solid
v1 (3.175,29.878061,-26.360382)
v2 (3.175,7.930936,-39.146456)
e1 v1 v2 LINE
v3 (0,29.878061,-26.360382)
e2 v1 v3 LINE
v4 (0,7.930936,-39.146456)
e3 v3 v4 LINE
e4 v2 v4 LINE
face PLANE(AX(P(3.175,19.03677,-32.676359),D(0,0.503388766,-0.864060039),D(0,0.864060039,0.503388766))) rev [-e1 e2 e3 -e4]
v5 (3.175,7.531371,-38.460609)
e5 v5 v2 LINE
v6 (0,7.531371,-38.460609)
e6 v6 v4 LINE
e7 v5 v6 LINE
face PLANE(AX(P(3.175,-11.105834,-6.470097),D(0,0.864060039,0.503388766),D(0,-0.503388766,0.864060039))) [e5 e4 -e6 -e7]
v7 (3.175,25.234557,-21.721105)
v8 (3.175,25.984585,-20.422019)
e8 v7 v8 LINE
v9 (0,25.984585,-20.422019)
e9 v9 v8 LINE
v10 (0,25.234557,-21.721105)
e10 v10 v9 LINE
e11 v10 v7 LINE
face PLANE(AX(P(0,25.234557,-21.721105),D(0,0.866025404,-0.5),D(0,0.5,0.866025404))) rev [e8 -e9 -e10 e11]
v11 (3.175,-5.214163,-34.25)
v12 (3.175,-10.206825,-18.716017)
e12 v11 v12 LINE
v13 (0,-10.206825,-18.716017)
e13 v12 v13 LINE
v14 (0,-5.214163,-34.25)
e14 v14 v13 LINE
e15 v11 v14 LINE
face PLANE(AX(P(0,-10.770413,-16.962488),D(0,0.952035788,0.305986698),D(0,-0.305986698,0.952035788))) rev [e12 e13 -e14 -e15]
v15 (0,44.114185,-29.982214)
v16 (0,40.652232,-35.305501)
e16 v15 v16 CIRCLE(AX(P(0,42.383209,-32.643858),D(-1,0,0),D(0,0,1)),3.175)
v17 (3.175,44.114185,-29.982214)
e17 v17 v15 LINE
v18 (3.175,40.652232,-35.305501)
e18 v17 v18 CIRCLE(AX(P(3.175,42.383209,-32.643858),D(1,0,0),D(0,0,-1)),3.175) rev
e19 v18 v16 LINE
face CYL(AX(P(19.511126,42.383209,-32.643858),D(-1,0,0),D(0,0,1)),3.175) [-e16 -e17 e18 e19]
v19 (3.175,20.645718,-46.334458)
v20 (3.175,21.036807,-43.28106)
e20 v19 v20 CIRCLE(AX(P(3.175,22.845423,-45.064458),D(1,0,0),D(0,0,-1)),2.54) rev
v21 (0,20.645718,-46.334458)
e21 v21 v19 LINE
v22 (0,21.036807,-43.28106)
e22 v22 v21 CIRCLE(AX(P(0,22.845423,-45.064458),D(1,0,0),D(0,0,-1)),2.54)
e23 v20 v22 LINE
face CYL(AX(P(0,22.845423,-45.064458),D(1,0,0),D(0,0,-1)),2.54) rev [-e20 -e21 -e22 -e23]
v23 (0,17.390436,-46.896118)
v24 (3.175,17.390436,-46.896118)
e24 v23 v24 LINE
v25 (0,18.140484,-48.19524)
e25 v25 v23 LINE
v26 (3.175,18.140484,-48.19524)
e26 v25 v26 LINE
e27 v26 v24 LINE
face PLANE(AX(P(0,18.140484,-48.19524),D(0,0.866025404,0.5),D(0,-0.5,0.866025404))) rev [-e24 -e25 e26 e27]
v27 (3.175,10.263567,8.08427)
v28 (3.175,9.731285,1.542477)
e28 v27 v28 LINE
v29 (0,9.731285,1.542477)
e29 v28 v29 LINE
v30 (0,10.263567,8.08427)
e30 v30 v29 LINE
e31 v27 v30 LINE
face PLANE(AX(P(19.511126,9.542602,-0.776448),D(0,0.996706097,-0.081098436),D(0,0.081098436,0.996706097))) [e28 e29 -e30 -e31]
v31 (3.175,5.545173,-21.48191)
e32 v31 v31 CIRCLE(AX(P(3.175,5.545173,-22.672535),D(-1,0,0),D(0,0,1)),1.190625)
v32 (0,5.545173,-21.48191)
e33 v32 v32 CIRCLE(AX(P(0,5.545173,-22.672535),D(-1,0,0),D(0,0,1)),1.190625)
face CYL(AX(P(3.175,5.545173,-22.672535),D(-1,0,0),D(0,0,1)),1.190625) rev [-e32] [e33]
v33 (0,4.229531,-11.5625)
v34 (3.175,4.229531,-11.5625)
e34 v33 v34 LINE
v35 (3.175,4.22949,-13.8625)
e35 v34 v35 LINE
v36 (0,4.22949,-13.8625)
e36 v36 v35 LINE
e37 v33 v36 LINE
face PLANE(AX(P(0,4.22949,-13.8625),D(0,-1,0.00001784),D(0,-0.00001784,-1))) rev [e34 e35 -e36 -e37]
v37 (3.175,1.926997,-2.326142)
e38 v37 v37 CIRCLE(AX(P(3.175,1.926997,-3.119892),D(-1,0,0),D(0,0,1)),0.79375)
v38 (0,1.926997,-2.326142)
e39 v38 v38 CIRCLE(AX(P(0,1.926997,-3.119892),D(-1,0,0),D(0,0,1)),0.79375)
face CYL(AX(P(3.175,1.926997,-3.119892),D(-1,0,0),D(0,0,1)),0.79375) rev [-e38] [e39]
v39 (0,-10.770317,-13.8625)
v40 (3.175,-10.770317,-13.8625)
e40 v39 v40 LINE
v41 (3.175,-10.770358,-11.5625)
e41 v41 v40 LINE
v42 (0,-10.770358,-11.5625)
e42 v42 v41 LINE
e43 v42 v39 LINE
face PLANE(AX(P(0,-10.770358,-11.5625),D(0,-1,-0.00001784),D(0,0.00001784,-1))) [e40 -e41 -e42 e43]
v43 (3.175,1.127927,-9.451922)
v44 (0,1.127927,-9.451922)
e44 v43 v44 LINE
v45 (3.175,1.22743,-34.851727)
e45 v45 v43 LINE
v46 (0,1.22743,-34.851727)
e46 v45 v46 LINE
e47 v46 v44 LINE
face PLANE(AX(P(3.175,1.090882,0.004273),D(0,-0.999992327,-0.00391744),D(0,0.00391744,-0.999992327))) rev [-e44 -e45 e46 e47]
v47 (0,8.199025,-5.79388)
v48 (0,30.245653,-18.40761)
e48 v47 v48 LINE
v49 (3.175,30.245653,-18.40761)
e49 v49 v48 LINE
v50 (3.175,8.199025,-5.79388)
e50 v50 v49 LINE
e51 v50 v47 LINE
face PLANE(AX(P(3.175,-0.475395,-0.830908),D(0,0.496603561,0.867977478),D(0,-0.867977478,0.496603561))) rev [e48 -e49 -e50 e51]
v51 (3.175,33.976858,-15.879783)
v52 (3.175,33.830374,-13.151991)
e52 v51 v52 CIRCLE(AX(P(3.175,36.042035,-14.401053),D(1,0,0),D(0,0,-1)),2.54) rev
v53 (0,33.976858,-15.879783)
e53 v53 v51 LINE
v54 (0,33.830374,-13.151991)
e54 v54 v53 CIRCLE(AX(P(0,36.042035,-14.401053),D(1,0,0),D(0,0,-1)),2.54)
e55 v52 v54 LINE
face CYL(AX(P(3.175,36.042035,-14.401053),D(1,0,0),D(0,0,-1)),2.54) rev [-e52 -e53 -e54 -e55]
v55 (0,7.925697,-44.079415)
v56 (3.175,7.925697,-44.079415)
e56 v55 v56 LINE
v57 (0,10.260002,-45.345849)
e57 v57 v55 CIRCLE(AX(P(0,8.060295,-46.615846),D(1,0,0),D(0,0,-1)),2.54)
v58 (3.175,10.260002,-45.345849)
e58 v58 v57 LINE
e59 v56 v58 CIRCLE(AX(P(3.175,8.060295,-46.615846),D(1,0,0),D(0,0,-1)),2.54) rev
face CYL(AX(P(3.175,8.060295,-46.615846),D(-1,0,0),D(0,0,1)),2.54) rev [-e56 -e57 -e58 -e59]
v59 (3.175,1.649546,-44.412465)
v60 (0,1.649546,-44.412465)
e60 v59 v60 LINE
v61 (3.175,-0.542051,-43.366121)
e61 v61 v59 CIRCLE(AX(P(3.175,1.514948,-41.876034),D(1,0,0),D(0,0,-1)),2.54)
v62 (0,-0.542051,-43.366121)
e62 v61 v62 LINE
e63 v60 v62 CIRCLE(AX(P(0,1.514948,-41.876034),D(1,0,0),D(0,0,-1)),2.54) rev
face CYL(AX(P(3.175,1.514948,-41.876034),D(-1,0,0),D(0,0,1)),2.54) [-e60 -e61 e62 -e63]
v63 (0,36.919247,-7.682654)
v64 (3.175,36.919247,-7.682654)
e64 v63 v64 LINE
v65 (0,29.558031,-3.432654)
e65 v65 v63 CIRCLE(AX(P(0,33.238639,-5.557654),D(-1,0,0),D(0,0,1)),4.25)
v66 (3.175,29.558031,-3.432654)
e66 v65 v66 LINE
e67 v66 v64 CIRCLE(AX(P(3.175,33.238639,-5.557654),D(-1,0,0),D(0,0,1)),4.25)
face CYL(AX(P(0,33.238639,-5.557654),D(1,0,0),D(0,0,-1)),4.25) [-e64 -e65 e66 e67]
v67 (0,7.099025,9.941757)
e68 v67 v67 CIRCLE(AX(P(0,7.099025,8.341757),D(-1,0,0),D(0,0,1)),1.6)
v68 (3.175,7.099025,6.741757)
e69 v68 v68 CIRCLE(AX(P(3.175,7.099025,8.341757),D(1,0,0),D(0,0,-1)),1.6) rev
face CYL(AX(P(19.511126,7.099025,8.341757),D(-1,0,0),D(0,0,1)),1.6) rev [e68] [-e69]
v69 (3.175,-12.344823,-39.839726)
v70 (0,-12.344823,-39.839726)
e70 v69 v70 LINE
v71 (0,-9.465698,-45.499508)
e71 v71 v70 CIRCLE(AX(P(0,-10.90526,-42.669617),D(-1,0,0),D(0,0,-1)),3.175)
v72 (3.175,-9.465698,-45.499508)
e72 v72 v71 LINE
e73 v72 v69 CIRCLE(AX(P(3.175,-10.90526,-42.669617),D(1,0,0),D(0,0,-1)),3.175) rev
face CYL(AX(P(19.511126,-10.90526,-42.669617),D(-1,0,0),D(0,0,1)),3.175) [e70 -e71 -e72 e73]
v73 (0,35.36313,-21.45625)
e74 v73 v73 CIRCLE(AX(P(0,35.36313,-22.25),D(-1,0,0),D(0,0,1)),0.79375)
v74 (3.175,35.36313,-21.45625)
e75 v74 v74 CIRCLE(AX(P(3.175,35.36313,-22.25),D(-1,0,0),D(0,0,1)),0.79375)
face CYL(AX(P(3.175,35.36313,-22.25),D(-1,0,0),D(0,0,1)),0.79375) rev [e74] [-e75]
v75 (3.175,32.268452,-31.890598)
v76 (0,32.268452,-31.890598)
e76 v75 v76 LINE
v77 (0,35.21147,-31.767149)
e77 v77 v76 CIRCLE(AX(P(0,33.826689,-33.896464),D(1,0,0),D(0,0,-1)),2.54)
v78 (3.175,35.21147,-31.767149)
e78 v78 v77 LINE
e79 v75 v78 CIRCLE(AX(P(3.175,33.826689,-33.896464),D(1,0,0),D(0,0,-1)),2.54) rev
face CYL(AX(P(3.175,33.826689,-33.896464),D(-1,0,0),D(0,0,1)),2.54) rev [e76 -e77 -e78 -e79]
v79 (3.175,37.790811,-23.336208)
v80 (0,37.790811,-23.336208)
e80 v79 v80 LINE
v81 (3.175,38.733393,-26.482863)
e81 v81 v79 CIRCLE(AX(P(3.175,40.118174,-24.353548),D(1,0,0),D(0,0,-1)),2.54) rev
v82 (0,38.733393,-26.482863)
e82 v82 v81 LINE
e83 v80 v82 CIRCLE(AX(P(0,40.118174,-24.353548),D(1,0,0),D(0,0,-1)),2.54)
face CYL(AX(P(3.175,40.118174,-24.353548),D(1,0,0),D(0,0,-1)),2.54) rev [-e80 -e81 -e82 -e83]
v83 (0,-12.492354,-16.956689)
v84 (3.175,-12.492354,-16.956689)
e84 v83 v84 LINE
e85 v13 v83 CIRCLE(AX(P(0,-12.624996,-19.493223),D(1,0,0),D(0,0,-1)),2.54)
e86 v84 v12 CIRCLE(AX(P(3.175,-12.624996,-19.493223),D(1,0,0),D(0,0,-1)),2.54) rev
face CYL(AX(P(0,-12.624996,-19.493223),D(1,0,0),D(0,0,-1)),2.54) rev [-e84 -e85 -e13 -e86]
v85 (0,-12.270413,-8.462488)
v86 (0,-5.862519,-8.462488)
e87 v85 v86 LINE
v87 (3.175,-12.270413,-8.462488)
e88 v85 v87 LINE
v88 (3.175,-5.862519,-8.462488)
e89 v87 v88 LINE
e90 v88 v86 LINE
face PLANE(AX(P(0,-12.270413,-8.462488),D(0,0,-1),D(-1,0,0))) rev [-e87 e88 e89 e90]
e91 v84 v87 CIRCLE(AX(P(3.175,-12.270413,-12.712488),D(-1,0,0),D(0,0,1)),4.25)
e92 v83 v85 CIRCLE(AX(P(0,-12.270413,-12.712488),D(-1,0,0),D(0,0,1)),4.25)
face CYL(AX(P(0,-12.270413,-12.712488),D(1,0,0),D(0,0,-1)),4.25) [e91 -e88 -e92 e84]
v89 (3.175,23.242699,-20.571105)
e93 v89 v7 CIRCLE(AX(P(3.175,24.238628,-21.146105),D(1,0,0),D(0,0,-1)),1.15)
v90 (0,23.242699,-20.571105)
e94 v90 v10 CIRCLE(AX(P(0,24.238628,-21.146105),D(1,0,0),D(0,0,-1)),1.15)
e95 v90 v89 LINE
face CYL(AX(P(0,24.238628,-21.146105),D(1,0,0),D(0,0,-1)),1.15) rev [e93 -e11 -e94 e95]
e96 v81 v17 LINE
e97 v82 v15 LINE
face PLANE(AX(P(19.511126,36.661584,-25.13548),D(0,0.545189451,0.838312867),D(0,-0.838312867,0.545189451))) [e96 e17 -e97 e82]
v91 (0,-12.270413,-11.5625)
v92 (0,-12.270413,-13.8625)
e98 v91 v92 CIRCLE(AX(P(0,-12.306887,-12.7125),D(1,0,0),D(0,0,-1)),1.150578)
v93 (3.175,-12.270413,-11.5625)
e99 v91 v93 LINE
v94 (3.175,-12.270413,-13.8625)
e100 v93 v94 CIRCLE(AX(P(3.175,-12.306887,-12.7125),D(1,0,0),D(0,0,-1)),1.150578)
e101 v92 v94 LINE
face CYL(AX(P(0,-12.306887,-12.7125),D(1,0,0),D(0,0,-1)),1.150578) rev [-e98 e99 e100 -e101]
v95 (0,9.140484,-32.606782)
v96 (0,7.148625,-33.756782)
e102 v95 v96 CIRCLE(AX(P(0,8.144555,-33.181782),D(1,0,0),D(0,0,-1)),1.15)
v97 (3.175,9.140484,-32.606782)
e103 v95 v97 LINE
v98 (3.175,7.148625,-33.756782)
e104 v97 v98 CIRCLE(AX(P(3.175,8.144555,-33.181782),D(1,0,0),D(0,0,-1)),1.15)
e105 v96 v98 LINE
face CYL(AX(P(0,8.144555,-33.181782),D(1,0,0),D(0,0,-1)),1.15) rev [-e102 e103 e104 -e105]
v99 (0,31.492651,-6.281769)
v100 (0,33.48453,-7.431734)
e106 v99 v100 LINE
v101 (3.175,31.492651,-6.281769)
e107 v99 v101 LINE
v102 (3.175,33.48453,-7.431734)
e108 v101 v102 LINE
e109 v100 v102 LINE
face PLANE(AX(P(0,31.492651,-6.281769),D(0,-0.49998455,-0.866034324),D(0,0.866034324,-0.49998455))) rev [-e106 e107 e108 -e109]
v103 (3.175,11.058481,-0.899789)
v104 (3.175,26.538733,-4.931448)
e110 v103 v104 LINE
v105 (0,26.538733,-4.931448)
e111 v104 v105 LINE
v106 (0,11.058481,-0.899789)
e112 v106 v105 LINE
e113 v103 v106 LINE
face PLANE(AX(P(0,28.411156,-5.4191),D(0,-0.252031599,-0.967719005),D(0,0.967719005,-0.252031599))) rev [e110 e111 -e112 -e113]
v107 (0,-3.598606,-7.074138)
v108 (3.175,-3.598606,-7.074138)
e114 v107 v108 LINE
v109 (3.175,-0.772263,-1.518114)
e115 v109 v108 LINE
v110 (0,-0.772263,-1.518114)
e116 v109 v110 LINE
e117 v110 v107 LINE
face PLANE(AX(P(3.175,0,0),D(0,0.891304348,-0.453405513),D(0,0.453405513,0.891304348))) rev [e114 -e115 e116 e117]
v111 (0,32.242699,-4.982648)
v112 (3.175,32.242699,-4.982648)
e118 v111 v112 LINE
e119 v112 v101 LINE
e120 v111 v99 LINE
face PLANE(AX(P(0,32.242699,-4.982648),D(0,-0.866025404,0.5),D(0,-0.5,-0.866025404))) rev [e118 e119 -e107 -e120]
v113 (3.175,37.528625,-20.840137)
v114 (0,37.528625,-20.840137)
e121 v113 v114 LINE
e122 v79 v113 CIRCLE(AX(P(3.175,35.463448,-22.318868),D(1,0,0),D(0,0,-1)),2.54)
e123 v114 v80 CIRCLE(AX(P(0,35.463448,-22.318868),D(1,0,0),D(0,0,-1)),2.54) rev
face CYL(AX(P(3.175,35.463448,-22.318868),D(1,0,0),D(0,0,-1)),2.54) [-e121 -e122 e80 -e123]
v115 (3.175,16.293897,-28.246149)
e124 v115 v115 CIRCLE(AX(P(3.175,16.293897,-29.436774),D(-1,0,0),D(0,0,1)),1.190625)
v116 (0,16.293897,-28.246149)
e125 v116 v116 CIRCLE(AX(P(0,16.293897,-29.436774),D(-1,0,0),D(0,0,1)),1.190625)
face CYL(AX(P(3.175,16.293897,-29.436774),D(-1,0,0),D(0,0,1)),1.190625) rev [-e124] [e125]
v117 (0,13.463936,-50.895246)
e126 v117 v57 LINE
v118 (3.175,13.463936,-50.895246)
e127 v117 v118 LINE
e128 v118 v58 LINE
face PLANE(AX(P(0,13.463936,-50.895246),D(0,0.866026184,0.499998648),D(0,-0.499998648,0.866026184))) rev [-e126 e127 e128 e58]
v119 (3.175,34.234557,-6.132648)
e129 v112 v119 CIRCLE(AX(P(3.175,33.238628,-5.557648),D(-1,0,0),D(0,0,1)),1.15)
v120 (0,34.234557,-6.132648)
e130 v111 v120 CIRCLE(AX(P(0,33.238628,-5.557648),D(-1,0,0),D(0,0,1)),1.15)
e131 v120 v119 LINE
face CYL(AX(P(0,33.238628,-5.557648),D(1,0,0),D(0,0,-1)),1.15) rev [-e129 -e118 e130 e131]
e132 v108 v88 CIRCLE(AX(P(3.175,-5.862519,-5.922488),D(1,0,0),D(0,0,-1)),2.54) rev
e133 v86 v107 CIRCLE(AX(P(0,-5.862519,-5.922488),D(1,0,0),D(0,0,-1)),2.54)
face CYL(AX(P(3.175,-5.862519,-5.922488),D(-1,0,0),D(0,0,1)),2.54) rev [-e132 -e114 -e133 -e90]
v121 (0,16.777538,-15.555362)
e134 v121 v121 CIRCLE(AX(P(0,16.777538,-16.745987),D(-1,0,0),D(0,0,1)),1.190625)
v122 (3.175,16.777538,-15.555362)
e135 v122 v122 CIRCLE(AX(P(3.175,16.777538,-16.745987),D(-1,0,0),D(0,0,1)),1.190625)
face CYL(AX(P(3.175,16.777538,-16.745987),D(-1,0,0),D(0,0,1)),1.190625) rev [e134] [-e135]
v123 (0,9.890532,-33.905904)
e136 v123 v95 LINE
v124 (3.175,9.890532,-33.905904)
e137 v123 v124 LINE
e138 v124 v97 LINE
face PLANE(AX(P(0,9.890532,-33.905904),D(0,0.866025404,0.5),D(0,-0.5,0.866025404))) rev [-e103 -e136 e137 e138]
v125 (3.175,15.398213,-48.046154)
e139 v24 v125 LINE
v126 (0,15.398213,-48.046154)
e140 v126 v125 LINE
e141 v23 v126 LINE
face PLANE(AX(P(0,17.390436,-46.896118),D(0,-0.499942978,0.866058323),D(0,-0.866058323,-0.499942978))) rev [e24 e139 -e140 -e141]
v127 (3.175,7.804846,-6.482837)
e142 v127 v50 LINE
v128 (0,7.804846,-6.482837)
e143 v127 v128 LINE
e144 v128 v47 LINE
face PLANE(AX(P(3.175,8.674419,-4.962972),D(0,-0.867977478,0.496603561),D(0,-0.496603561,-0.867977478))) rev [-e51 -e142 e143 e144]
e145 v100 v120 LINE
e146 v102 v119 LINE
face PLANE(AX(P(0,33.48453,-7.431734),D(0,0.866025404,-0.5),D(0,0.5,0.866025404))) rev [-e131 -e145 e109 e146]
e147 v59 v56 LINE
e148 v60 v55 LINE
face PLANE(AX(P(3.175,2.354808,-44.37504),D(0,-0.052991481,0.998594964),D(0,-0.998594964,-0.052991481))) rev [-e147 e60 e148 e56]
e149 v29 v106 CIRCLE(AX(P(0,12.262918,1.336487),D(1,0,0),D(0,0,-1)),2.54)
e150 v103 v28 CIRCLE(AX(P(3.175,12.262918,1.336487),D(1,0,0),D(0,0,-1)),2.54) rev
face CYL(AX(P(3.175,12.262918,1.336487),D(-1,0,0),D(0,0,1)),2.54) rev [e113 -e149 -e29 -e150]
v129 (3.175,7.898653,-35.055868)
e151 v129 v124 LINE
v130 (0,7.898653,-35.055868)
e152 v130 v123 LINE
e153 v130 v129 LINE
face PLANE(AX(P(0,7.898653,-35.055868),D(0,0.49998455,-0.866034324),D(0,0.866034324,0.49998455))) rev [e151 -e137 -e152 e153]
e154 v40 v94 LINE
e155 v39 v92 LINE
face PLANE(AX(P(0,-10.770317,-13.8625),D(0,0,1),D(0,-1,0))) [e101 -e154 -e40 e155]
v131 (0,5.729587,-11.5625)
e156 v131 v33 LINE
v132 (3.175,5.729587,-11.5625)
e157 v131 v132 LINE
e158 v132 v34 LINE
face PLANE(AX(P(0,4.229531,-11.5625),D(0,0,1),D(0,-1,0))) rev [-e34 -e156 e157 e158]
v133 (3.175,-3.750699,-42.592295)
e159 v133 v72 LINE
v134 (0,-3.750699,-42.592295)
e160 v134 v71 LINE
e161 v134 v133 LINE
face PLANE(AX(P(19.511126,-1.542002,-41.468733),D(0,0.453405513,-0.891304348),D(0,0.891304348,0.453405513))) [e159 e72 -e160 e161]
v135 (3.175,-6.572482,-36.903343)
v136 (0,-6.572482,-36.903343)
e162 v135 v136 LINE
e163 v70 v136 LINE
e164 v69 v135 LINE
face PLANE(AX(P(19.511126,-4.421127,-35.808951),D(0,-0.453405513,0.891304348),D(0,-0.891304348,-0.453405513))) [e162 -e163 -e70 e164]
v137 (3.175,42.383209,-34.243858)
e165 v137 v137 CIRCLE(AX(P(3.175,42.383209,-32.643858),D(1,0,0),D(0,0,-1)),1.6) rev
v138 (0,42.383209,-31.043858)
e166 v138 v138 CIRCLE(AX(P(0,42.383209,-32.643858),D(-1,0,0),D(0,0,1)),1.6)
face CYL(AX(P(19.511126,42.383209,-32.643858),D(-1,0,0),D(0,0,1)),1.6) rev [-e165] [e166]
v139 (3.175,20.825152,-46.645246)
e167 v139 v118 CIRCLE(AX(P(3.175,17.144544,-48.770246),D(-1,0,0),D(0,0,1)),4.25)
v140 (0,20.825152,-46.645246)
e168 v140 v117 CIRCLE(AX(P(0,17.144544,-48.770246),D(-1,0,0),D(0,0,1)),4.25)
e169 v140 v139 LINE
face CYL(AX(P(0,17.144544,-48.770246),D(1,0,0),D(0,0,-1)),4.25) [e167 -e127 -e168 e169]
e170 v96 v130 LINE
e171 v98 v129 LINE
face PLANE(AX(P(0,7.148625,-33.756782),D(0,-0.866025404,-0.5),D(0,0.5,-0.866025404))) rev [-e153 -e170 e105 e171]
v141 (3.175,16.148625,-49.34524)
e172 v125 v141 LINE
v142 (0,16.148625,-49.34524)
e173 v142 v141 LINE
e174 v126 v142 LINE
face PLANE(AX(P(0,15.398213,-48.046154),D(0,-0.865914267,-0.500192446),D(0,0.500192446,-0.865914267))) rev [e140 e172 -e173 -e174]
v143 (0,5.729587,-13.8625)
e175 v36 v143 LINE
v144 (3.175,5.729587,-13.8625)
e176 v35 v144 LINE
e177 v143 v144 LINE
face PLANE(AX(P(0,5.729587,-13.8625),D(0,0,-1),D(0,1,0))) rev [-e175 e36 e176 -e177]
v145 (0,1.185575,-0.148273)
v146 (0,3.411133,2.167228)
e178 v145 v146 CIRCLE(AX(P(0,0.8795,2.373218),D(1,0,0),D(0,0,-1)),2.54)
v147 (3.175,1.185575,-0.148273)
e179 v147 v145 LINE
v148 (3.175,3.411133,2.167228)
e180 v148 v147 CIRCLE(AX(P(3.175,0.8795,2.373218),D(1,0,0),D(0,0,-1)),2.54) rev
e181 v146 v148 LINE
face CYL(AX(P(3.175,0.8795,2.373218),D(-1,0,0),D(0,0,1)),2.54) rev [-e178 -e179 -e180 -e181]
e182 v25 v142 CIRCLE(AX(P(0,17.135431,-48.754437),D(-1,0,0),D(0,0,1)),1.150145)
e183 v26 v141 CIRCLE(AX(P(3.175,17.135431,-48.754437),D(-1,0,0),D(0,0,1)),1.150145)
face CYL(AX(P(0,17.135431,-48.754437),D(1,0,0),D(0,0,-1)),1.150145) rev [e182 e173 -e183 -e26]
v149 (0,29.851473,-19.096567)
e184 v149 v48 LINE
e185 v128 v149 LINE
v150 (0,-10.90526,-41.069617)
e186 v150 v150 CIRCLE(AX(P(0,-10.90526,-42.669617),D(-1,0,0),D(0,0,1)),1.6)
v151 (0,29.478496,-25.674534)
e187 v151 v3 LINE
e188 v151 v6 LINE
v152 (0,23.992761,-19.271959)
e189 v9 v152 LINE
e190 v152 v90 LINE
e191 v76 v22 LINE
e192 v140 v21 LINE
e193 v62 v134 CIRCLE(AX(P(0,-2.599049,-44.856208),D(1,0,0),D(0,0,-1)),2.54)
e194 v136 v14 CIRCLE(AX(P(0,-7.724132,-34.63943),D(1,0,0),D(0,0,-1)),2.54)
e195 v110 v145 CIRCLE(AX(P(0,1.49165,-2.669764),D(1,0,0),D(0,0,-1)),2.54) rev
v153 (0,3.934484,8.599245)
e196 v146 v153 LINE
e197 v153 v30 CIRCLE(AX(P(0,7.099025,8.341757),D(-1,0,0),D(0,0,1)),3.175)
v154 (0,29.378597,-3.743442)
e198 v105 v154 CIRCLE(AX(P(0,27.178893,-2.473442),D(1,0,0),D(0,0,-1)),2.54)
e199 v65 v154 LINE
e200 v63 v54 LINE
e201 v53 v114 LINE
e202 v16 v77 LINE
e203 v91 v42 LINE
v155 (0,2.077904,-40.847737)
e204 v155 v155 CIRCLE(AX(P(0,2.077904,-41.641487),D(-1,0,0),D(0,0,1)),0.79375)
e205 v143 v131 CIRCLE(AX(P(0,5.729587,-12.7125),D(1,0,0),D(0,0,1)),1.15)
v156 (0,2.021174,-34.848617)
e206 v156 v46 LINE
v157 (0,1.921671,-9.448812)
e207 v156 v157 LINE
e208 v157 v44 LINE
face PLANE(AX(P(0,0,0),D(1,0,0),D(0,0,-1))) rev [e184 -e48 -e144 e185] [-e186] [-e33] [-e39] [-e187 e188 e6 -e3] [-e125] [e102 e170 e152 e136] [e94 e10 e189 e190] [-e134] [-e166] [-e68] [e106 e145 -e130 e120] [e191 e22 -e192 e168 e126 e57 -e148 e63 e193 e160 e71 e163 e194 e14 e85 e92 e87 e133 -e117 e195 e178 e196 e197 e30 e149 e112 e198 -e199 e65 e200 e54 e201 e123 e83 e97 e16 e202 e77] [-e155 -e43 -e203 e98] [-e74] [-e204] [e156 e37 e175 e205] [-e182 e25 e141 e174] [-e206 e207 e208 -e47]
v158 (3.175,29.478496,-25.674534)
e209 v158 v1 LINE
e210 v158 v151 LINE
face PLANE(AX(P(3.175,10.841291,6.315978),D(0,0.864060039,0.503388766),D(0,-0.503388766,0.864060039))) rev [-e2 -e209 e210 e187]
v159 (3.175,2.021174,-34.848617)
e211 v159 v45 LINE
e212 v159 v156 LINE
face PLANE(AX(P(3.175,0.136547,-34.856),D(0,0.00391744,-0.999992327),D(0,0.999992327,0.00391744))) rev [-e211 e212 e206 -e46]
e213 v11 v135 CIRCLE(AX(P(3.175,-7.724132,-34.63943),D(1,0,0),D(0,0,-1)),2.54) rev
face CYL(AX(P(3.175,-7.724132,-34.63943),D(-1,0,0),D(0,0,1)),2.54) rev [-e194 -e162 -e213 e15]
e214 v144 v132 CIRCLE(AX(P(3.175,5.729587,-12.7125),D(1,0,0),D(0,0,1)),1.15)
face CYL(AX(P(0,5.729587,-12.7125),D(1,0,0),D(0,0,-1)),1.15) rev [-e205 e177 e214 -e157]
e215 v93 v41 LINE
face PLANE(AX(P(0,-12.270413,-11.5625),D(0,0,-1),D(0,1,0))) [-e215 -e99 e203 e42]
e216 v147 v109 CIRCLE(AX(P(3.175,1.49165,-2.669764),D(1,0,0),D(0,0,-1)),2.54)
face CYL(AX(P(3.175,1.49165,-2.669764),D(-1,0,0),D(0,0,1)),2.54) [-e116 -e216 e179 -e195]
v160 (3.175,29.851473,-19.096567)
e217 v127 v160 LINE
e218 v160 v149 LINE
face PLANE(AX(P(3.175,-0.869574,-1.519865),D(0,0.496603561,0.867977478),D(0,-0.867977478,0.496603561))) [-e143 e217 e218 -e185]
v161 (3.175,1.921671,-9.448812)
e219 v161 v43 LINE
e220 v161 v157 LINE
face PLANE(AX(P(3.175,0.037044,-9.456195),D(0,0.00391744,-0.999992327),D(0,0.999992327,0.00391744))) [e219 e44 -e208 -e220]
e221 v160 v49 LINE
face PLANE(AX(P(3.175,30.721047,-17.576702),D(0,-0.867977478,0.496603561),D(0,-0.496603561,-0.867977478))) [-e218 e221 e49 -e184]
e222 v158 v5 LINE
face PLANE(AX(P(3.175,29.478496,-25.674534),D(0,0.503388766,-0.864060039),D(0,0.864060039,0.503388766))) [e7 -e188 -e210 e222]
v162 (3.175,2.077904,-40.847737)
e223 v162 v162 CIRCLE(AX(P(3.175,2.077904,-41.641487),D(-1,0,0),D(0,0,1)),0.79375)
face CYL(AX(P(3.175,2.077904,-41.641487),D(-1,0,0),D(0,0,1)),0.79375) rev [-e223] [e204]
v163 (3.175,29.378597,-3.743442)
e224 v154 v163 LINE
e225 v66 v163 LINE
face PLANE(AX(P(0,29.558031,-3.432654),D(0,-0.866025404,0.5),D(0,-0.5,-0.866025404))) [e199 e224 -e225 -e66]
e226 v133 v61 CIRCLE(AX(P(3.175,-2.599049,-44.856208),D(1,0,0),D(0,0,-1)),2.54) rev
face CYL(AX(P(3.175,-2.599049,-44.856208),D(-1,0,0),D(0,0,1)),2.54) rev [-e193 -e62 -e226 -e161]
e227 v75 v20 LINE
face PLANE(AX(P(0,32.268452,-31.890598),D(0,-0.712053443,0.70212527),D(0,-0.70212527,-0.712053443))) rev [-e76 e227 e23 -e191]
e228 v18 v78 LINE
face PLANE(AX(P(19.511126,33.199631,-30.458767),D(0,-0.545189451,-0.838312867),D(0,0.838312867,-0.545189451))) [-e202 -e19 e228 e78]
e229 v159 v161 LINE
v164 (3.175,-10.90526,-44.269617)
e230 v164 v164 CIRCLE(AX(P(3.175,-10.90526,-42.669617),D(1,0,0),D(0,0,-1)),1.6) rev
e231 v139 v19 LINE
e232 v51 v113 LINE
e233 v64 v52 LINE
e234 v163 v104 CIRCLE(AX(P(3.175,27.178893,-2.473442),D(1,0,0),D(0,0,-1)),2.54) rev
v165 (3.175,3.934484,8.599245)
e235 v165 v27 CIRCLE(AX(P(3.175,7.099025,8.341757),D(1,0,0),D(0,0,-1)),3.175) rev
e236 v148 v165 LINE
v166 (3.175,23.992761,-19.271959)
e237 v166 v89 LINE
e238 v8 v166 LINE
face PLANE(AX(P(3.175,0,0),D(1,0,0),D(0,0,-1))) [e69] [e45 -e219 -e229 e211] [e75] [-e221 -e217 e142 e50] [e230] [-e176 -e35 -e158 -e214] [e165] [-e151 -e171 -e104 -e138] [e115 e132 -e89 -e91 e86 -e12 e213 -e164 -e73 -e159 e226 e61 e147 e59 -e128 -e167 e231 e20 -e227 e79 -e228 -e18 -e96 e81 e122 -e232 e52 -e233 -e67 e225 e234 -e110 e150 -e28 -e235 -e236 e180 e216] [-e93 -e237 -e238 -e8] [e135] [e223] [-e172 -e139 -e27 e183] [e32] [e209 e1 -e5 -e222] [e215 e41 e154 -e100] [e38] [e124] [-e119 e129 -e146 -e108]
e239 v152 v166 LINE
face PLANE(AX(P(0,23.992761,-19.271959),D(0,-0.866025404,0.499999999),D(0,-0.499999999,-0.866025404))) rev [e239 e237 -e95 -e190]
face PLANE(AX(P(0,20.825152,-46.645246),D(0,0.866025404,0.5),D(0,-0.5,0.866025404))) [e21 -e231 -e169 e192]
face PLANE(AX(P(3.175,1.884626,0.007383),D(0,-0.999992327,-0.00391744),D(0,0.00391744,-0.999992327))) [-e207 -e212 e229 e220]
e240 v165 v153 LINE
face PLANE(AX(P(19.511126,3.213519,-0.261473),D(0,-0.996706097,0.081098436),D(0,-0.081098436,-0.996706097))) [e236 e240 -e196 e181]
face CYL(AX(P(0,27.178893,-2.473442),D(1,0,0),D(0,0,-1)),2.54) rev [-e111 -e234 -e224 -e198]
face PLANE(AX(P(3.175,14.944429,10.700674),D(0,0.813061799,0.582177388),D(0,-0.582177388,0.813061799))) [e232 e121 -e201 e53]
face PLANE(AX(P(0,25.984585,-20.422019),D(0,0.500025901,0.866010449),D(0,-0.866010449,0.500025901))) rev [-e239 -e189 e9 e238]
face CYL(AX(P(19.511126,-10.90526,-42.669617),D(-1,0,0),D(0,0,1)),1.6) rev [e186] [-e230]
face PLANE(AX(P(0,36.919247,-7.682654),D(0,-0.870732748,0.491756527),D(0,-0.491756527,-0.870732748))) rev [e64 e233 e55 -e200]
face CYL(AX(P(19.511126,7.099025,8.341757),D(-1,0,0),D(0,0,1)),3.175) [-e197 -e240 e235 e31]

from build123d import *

# Parameters (mm, degrees)
BOSS_EXTRUDE1_DEPTH = 3.175
SKETCH7_R           = 0.79375
CUT_EXTRUDE6_DEPTH  = 59.953525128
SKETCH8_W           = 24
SKETCH8_H           = 4.7625
BOSS_EXTRUDE2_DEPTH = 3.175
BOSS_EXTRUDE3_DEPTH = 3.175
CUT_EXTRUDE8_DEPTH  = 3.175
CUT_EXTRUDE7_DEPTH  = 3.175
FILLET1_R           = 2.54
FILLET2_R           = 2.54
SKETCH13_R          = 1.190625
CUT_EXTRUDE9_DEPTH  = 3.175
CUT_EXTRUDE10_DEPTH = 3.175
SKETCH17_R          = 1.6
BOSS_EXTRUDE5_DEPTH = 3.175
FILLET4_R           = 2.54


with BuildPart() as part:
    # Sketch1 → Boss-Extrude1 (new body)
    with BuildSketch(Plane(origin=(0, 0, 0), x_dir=(0, 0, -1), z_dir=(1, 0, 0))):
        Polygon((43.890597967, 11.483842091), (31.890597967, 32.268451781), (22.25, 38.538130468), (44.5, 0), align=None)
        Polygon((22.25, 38.538130468), (44.5, 0), (0, 0), align=None)
        Polygon((0.899789316, 11.058480811), (12.899789316, 31.843090502), (22.25, 38.538130468), (0, 0), align=None)
        Polygon((10.25, -5.214163404), (34.25, -5.214163404), (44.5, 0), (0, 0), align=None)
    extrude(amount=BOSS_EXTRUDE1_DEPTH)

    # Sketch7 → Cut-Extrude6 (cut, through all)
    with BuildSketch(Plane.ZY):
        with Locations((-22.25, 35.363130468)):
            Circle(SKETCH7_R)
        with Locations((-3.119892109, 1.92699728)):
            Circle(SKETCH7_R)
        with Locations((-41.6414868, 2.077904463)):
            Circle(SKETCH7_R)
    extrude(amount=-CUT_EXTRUDE6_DEPTH, mode=Mode.SUBTRACT)

    # Sketch8 → Boss-Extrude2 (add)
    with BuildSketch(Plane.ZY):
        Polygon((-43.890597967, 11.483842091), (-31.890597967, 32.268451781), (-36.015043953, 34.649701781), (-48.015043953, 13.865092091), align=None)
        with Locations((-22.25, -7.595413404)):
            Rectangle(SKETCH8_W, SKETCH8_H)
        Polygon((-12.899789316, 31.843090502), (-0.899789316, 11.058480811), (3.22465667, 13.439730811), (-8.77534333, 34.224340502), align=None)
    extrude(amount=-BOSS_EXTRUDE2_DEPTH)

    # Sketch9 → Boss-Extrude3 (add)
    # profile 1 of 3: a face of its own
    with BuildSketch(Plane(origin=(3.175, 0, 0), x_dir=(0, 0, -1), z_dir=(1, 0, 0))):
        with BuildLine():
            Line((3.432653779, 29.558030749), (5.419099548, 28.411155749))
            Line((5.419099548, 28.411155749), (8.77534333, 34.224340502))
            Line((8.77534333, 34.224340502), (12.899789316, 31.843090502))
            Line((12.899789316, 31.843090502), (14.562601584, 33.033715502))
            Line((14.562601584, 33.033715502), (7.682653779, 36.919246681))
            ThreePointArc((7.682653779, 36.919246681), (1.877045812, 35.363638715), (3.432653779, 29.558030749))
        make_face()
        with BuildLine():
            Line((4.98264756, 32.24269873), (6.281769095, 31.492650563))
            Line((6.281769095, 31.492650563), (7.43173356, 33.484529507))
            Line((7.43173356, 33.484529507), (6.13264756, 34.234557159))
            ThreePointArc((6.13264756, 34.234557159), (4.561718346, 33.813627945), (4.98264756, 32.24269873))
        make_face(mode=Mode.SUBTRACT)
    # profile 2 of 3: a face of its own
    with BuildSketch(Plane(origin=(3.175, 0, 0), x_dir=(0, 0, -1), z_dir=(1, 0, 0))):
        with BuildLine():
            Line((8.462487563, -12.270413404), (8.462487563, -4.304857849))
            Line((8.462487563, -4.304857849), (10.25, -5.214163404))
            Line((10.25, -5.214163404), (10.25, -9.976663404))
            Line((10.25, -9.976663404), (20.606380555, -9.976663404))
            Line((20.606380555, -9.976663404), (20.606380555, -10.770413404))
            Line((20.606380555, -10.770413404), (16.962487563, -10.770413404))
            Line((16.962487563, -10.770413404), (16.962487563, -12.270413404))
            ThreePointArc((16.962487563, -12.270413404), (12.712487563, -16.520413404), (8.462487563, -12.270413404))
        make_face()
        with BuildLine():
            Line((11.5625, -12.270413404), (11.5625, -10.7703581))
            Line((11.5625, -10.7703581), (13.8625, -10.770317068))
            Line((13.8625, -10.770317068), (13.8625, -12.270413404))
            ThreePointArc((13.8625, -12.270413404), (12.7125, -13.457465158), (11.5625, -12.270413404))
        make_face(mode=Mode.SUBTRACT)
    # profile 3 of 3: a face of its own
    with BuildSketch(Plane(origin=(3.175, 0, 0), x_dir=(0, 0, -1), z_dir=(1, 0, 0))):
        with BuildLine():
            Line((46.645245941, 20.825151843), (44.658800171, 19.678276843))
            Line((44.658800171, 19.678276843), (48.015043953, 13.865092091))
            Line((48.015043953, 13.865092091), (43.890597967, 11.483842091))
            Line((43.890597967, 11.483842091), (43.996871736, 9.481172067))
            Line((43.996871736, 9.481172067), (50.895245941, 13.463935911))
            ThreePointArc((50.895245941, 13.463935911), (52.450853907, 19.269543877), (46.645245941, 20.825151843))
        make_face()
        with BuildLine():
            Line((48.195239723, 18.140483862), (46.896118188, 17.390435694))
            Line((46.896118188, 17.390435694), (48.046153723, 15.398212801))
            Line((48.046153723, 15.398212801), (49.345239723, 16.148625433))
            ThreePointArc((49.345239723, 16.148625433), (49.750491106, 17.710503048), (48.195239723, 18.140483862))
        make_face(mode=Mode.SUBTRACT)
    extrude(amount=-BOSS_EXTRUDE3_DEPTH)

    # Sketch12 → Cut-Extrude8 (cut)
    with BuildSketch(Plane(origin=(3.175, 0, 0), x_dir=(0, 0, -1), z_dir=(1, 0, 0))):
        with BuildLine():
            Line((33.756782454, 7.148625433), (35.055868454, 7.898653085))
            Line((35.055868454, 7.898653085), (33.905903989, 9.89053203))
            Line((33.905903989, 9.89053203), (32.606782454, 9.140483862))
            ThreePointArc((32.606782454, 9.140483862), (32.18585324, 7.569554647), (33.756782454, 7.148625433))
        make_face()
        with BuildLine():
            Line((21.721104828, 25.234557159), (20.422018828, 25.984584811))
            Line((20.422018828, 25.984584811), (19.271959255, 23.992760775))
            Line((19.271959255, 23.992760775), (20.571104828, 23.24269873))
            ThreePointArc((20.571104828, 23.24269873), (22.142034043, 23.663627945), (21.721104828, 25.234557159))
        make_face()
        with BuildLine():
            Line((13.8625, 5.729586596), (13.8625, 4.229490261))
            Line((13.8625, 4.229490261), (11.5625, 4.229531293))
            Line((11.5625, 4.229531293), (11.5625, 5.729586596))
            ThreePointArc((11.5625, 5.729586596), (12.7125, 6.879586596), (13.8625, 5.729586596))
        make_face()
    extrude(amount=-CUT_EXTRUDE8_DEPTH, mode=Mode.SUBTRACT)

    # Sketch10 → Cut-Extrude7 (cut)
    with BuildSketch(Plane(origin=(3.175, 0, 0), x_dir=(0, 0, -1), z_dir=(1, 0, 0))):
        Polygon((31.890597967, 32.268451781), (44.658800171, 19.678276843), (36.015043953, 34.649701781), align=None)
        Polygon((5.419099548, 28.411155749), (0.899789316, 11.058480811), (-3.22465667, 13.439730811), align=None)
        Polygon((16.962487563, -10.770413404), (34.25, -5.214163404), (34.25, -11.414104667), align=None)
    extrude(amount=-CUT_EXTRUDE7_DEPTH, mode=Mode.SUBTRACT)

    # Fillet1
    fillet1_edges = [part.edges().sort_by_distance(p)[0] for p in [
        (1.5875, -10.770413404, -16.962487563),
    ]]
    fillet(fillet1_edges, radius=FILLET1_R)

    # Fillet2
    fillet2_edges = [part.edges().sort_by_distance(p)[0] for p in [
        (1.5875, 19.678276843, -44.658800171),
        (1.5875, 9.481172067, -43.996871736),
        (1.5875, -4.304857849, -8.462487563),
        (1.5875, 0, -44.5),
        (1.5875, 0, 0),
        (1.5875, 38.538130468, -22.25),
        (1.5875, 33.033715502, -14.562601584),
        (1.5875, 28.411155749, -5.419099548),
    ]]
    fillet(fillet2_edges, radius=FILLET2_R)

    # Sketch13 → Cut-Extrude9 (cut)
    with BuildSketch(Plane.ZY):
        with BuildLine():
            ThreePointArc((-15.555361616, 16.777538207), (-16.768661404, 17.967947273), (-17.935747959, 16.732196856))
            Line((-17.935747959, 16.732196856), (-16.745986616, 16.777538207))
            Line((-16.745986616, 16.777538207), (-17.301600526, 15.724503984))
            ThreePointArc((-17.301600526, 15.724503984), (-16.131145141, 15.757951109), (-15.555361616, 16.777538207))
        make_face()
        with BuildLine():
            Line((-16.745986616, 16.777538207), (-17.935747959, 16.732196856))
            ThreePointArc((-17.935747959, 16.732196856), (-17.753679488, 16.143390774), (-17.301600526, 15.724503984))
            Line((-17.301600526, 15.724503984), (-16.745986616, 16.777538207))
        make_face()
        with Locations((-22.672534986, 5.545173165)):
            Circle(SKETCH13_R)
        with Locations((-29.436774271, 16.293897131)):
            Circle(SKETCH13_R)
    extrude(amount=-CUT_EXTRUDE9_DEPTH, mode=Mode.SUBTRACT)

    # Sketch14 → Cut-Extrude10 (cut)
    with BuildSketch(Plane.ZY):
        Polygon((-6.482836936, 7.804845527), (-19.096567387, 29.85147348), (-18.407610264, 30.245652557), (-5.793879812, 8.199024604), align=None)
        Polygon((-34.848617406, 2.021173684), (-9.448812305, 1.921670715), (-9.451921773, 1.127926805), (-34.851726873, 1.227429774), align=None)
        Polygon((-25.674533914, 29.478496091), (-38.460608564, 7.531371107), (-39.146456219, 7.930935939), (-26.36038157, 29.878060923), align=None)
    extrude(amount=-CUT_EXTRUDE10_DEPTH, mode=Mode.SUBTRACT)

    # Sketch17 → Boss-Extrude5 (add)
    # profile 1 of 3: a face of its own
    with BuildSketch(Plane.ZY):
        with BuildLine():
            Line((-35.808950658, -4.421126968), (-39.839725672, -12.34482262))
            ThreePointArc((-39.839725672, -12.34482262), (-44.109179481, -13.735151419), (-45.499508281, -9.46569761))
            Line((-45.499508281, -9.46569761), (-41.468733267, -1.542001958))
            Line((-41.468733267, -1.542001958), (-35.808950658, -4.421126968))
        make_face()
        with Locations((-42.669616976, -10.905260115)):
            Circle(SKETCH17_R, mode=Mode.SUBTRACT)
    # profile 2 of 3: a face of its own
    with BuildSketch(Plane.ZY):
        with BuildLine():
            Line((-0.261472593, 3.213518539), (8.599244609, 3.934483634))
            ThreePointArc((8.599244609, 3.934483634), (11.506298933, 7.356513026), (8.084269542, 10.26356735))
            Line((8.084269542, 10.26356735), (-0.77644766, 9.542602255))
            Line((-0.77644766, 9.542602255), (-0.261472593, 3.213518539))
        make_face()
        with Locations((8.341757075, 7.099025492)):
            Circle(SKETCH17_R, mode=Mode.SUBTRACT)
    # profile 3 of 3: a face of its own
    with BuildSketch(Plane.ZY):
        with BuildLine():
            Line((-25.13548002, 36.661583739), (-29.98221424, 44.114185124))
            ThreePointArc((-29.98221424, 44.114185124), (-34.374834099, 45.044851969), (-35.305500944, 40.65223211))
            Line((-35.305500944, 40.65223211), (-30.458766724, 33.199630725))
            Line((-30.458766724, 33.199630725), (-25.13548002, 36.661583739))
        make_face()
        with Locations((-32.643857592, 42.383208617)):
            Circle(SKETCH17_R, mode=Mode.SUBTRACT)
    extrude(amount=-BOSS_EXTRUDE5_DEPTH)

    # Fillet4
    # the kernel refuses this fillet: 2.54 mm, written as the material it adds along each edge
    with BuildSketch(Plane(origin=(0, 36.661583739, -25.13548002), x_dir=(0, 0.5315830218036889, 0.8470061929703104), z_dir=(1, 0, 0))) as fillet4_piece_1:
        with BuildLine():
            CenterArc((2.499765737, -2.512091747), FILLET4_R, 98.501304121, 80.573560632)
            Line((-0.039903163, -2.471081023), (-0.293870053, -2.46697995))
            Line((-0.293870053, -2.46697995), (-0.25396689, 0.004101072))
            Line((-0.25396689, 0.004101072), (0.004101072, 0.25396689))
            ThreePointArc((0.004101072, 0.25396689), (1.711869919, 0.226389737), (2.086723346, 0.251209175))
            Line((2.086723346, 0.251209175), (2.124272654, 0))
        make_face()
    extrude(amount=3.175)
    with BuildSketch(Plane(origin=(0, 33.199630725, -30.458766724), x_dir=(0, -0.5451894510403108, -0.838312866699757), z_dir=(1, 0, 0))) as fillet4_piece_2:
        with BuildLine():
            CenterArc((2.54, 2.399867047), FILLET4_R, 180, 70.879109992)
            Line((0, 2.399867047), (-0.0508, 2.399867047))
            Line((-0.0508, 2.399867047), (-0.0508, 0))
            Line((-0.0508, 0), (0, -0.0508))
            ThreePointArc((0, -0.0508), (0.853995746, -0.0508), (1.691351321, -0.047997341))
            Line((1.691351321, -0.047997341), (1.707991491, 0))
        make_face()
    extrude(amount=3.175)
    with BuildSketch(Plane(origin=(0, -1.542001958, -41.468733267), x_dir=(0, 0.466230647669412, -0.8846632032439015), z_dir=(1, 0, 0))) as fillet4_piece_3:
        with BuildLine():
            CenterArc((2.503946527, -2.514474671), FILLET4_R, 98.12963068, 81.042861753)
            Line((-0.035788565, -2.477791408), (-0.289762074, -2.474123082))
            Line((-0.289762074, -2.474123082), (-0.253973509, 0.003668326))
            Line((-0.253973509, 0.003668326), (0.003668326, 0.253973509))
            ThreePointArc((0.003668326, 0.253973509), (1.752552501, 0.228713088), (2.108838028, 0.251447467))
            Line((2.108838028, 0.251447467), (2.144756982, 0))
        make_face()
    extrude(amount=3.175)
    with BuildSketch(Plane(origin=(0, -4.421126968, -35.808950658), x_dir=(0, -0.4534055133611399, 0.8913043478261066), z_dir=(1, 0, 0))) as fillet4_piece_4:
        with BuildLine():
            CenterArc((2.54, 2.413715879), FILLET4_R, 180, 71.856915027)
            Line((0, 2.413715879), (-0.0508, 2.413715879))
            Line((-0.0508, 2.413715879), (-0.0508, 0))
            Line((-0.0508, 0), (0, -0.0508))
            ThreePointArc((0, -0.0508), (0.874533296, -0.0508), (1.733247924, -0.048274318))
            Line((1.733247924, -0.048274318), (1.749066592, 0))
        make_face()
    extrude(amount=3.175)
    with BuildSketch(Plane(origin=(0, 9.542602255, -0.77644766), x_dir=(0, 0.9967060969511591, -0.08109843586892752), z_dir=(1, 0, 0))) as fillet4_piece_5:
        with BuildLine():
            CenterArc((2.54, 2.326587881), FILLET4_R, 180, 66.345211462)
            Line((0, 2.326587881), (-0.0508, 2.326587881))
            Line((-0.0508, 2.326587881), (-0.0508, 0))
            Line((-0.0508, 0), (0, -0.0508))
            ThreePointArc((0, -0.0508), (0.760444107, -0.0508), (1.500505979, -0.046531758))
            Line((1.500505979, -0.046531758), (1.520888214, 0))
        make_face()
    extrude(amount=3.175)
    with BuildSketch(Plane(origin=(0, 3.213518539, -0.261472593), x_dir=(0, -0.9984457063976324, 0.05573303666706552), z_dir=(1, 0, 0))) as fillet4_piece_6:
        with BuildLine():
            CenterArc((2.477230301, -2.500513603), FILLET4_R, 100.115998519, 78.42721807)
            Line((-0.061948733, -2.435939367), (-0.315866636, -2.429481943))
            Line((-0.315866636, -2.429481943), (-0.253917903, 0.006457424))
            Line((-0.253917903, 0.006457424), (0.006457424, 0.253917903))
            ThreePointArc((0.006457424, 0.253917903), (1.526854064, 0.215252472), (1.986487618, 0.25005136))
            Line((1.986487618, 0.25005136), (2.031100589, 0))
        make_face()
    extrude(amount=3.175)


solid = part.part
